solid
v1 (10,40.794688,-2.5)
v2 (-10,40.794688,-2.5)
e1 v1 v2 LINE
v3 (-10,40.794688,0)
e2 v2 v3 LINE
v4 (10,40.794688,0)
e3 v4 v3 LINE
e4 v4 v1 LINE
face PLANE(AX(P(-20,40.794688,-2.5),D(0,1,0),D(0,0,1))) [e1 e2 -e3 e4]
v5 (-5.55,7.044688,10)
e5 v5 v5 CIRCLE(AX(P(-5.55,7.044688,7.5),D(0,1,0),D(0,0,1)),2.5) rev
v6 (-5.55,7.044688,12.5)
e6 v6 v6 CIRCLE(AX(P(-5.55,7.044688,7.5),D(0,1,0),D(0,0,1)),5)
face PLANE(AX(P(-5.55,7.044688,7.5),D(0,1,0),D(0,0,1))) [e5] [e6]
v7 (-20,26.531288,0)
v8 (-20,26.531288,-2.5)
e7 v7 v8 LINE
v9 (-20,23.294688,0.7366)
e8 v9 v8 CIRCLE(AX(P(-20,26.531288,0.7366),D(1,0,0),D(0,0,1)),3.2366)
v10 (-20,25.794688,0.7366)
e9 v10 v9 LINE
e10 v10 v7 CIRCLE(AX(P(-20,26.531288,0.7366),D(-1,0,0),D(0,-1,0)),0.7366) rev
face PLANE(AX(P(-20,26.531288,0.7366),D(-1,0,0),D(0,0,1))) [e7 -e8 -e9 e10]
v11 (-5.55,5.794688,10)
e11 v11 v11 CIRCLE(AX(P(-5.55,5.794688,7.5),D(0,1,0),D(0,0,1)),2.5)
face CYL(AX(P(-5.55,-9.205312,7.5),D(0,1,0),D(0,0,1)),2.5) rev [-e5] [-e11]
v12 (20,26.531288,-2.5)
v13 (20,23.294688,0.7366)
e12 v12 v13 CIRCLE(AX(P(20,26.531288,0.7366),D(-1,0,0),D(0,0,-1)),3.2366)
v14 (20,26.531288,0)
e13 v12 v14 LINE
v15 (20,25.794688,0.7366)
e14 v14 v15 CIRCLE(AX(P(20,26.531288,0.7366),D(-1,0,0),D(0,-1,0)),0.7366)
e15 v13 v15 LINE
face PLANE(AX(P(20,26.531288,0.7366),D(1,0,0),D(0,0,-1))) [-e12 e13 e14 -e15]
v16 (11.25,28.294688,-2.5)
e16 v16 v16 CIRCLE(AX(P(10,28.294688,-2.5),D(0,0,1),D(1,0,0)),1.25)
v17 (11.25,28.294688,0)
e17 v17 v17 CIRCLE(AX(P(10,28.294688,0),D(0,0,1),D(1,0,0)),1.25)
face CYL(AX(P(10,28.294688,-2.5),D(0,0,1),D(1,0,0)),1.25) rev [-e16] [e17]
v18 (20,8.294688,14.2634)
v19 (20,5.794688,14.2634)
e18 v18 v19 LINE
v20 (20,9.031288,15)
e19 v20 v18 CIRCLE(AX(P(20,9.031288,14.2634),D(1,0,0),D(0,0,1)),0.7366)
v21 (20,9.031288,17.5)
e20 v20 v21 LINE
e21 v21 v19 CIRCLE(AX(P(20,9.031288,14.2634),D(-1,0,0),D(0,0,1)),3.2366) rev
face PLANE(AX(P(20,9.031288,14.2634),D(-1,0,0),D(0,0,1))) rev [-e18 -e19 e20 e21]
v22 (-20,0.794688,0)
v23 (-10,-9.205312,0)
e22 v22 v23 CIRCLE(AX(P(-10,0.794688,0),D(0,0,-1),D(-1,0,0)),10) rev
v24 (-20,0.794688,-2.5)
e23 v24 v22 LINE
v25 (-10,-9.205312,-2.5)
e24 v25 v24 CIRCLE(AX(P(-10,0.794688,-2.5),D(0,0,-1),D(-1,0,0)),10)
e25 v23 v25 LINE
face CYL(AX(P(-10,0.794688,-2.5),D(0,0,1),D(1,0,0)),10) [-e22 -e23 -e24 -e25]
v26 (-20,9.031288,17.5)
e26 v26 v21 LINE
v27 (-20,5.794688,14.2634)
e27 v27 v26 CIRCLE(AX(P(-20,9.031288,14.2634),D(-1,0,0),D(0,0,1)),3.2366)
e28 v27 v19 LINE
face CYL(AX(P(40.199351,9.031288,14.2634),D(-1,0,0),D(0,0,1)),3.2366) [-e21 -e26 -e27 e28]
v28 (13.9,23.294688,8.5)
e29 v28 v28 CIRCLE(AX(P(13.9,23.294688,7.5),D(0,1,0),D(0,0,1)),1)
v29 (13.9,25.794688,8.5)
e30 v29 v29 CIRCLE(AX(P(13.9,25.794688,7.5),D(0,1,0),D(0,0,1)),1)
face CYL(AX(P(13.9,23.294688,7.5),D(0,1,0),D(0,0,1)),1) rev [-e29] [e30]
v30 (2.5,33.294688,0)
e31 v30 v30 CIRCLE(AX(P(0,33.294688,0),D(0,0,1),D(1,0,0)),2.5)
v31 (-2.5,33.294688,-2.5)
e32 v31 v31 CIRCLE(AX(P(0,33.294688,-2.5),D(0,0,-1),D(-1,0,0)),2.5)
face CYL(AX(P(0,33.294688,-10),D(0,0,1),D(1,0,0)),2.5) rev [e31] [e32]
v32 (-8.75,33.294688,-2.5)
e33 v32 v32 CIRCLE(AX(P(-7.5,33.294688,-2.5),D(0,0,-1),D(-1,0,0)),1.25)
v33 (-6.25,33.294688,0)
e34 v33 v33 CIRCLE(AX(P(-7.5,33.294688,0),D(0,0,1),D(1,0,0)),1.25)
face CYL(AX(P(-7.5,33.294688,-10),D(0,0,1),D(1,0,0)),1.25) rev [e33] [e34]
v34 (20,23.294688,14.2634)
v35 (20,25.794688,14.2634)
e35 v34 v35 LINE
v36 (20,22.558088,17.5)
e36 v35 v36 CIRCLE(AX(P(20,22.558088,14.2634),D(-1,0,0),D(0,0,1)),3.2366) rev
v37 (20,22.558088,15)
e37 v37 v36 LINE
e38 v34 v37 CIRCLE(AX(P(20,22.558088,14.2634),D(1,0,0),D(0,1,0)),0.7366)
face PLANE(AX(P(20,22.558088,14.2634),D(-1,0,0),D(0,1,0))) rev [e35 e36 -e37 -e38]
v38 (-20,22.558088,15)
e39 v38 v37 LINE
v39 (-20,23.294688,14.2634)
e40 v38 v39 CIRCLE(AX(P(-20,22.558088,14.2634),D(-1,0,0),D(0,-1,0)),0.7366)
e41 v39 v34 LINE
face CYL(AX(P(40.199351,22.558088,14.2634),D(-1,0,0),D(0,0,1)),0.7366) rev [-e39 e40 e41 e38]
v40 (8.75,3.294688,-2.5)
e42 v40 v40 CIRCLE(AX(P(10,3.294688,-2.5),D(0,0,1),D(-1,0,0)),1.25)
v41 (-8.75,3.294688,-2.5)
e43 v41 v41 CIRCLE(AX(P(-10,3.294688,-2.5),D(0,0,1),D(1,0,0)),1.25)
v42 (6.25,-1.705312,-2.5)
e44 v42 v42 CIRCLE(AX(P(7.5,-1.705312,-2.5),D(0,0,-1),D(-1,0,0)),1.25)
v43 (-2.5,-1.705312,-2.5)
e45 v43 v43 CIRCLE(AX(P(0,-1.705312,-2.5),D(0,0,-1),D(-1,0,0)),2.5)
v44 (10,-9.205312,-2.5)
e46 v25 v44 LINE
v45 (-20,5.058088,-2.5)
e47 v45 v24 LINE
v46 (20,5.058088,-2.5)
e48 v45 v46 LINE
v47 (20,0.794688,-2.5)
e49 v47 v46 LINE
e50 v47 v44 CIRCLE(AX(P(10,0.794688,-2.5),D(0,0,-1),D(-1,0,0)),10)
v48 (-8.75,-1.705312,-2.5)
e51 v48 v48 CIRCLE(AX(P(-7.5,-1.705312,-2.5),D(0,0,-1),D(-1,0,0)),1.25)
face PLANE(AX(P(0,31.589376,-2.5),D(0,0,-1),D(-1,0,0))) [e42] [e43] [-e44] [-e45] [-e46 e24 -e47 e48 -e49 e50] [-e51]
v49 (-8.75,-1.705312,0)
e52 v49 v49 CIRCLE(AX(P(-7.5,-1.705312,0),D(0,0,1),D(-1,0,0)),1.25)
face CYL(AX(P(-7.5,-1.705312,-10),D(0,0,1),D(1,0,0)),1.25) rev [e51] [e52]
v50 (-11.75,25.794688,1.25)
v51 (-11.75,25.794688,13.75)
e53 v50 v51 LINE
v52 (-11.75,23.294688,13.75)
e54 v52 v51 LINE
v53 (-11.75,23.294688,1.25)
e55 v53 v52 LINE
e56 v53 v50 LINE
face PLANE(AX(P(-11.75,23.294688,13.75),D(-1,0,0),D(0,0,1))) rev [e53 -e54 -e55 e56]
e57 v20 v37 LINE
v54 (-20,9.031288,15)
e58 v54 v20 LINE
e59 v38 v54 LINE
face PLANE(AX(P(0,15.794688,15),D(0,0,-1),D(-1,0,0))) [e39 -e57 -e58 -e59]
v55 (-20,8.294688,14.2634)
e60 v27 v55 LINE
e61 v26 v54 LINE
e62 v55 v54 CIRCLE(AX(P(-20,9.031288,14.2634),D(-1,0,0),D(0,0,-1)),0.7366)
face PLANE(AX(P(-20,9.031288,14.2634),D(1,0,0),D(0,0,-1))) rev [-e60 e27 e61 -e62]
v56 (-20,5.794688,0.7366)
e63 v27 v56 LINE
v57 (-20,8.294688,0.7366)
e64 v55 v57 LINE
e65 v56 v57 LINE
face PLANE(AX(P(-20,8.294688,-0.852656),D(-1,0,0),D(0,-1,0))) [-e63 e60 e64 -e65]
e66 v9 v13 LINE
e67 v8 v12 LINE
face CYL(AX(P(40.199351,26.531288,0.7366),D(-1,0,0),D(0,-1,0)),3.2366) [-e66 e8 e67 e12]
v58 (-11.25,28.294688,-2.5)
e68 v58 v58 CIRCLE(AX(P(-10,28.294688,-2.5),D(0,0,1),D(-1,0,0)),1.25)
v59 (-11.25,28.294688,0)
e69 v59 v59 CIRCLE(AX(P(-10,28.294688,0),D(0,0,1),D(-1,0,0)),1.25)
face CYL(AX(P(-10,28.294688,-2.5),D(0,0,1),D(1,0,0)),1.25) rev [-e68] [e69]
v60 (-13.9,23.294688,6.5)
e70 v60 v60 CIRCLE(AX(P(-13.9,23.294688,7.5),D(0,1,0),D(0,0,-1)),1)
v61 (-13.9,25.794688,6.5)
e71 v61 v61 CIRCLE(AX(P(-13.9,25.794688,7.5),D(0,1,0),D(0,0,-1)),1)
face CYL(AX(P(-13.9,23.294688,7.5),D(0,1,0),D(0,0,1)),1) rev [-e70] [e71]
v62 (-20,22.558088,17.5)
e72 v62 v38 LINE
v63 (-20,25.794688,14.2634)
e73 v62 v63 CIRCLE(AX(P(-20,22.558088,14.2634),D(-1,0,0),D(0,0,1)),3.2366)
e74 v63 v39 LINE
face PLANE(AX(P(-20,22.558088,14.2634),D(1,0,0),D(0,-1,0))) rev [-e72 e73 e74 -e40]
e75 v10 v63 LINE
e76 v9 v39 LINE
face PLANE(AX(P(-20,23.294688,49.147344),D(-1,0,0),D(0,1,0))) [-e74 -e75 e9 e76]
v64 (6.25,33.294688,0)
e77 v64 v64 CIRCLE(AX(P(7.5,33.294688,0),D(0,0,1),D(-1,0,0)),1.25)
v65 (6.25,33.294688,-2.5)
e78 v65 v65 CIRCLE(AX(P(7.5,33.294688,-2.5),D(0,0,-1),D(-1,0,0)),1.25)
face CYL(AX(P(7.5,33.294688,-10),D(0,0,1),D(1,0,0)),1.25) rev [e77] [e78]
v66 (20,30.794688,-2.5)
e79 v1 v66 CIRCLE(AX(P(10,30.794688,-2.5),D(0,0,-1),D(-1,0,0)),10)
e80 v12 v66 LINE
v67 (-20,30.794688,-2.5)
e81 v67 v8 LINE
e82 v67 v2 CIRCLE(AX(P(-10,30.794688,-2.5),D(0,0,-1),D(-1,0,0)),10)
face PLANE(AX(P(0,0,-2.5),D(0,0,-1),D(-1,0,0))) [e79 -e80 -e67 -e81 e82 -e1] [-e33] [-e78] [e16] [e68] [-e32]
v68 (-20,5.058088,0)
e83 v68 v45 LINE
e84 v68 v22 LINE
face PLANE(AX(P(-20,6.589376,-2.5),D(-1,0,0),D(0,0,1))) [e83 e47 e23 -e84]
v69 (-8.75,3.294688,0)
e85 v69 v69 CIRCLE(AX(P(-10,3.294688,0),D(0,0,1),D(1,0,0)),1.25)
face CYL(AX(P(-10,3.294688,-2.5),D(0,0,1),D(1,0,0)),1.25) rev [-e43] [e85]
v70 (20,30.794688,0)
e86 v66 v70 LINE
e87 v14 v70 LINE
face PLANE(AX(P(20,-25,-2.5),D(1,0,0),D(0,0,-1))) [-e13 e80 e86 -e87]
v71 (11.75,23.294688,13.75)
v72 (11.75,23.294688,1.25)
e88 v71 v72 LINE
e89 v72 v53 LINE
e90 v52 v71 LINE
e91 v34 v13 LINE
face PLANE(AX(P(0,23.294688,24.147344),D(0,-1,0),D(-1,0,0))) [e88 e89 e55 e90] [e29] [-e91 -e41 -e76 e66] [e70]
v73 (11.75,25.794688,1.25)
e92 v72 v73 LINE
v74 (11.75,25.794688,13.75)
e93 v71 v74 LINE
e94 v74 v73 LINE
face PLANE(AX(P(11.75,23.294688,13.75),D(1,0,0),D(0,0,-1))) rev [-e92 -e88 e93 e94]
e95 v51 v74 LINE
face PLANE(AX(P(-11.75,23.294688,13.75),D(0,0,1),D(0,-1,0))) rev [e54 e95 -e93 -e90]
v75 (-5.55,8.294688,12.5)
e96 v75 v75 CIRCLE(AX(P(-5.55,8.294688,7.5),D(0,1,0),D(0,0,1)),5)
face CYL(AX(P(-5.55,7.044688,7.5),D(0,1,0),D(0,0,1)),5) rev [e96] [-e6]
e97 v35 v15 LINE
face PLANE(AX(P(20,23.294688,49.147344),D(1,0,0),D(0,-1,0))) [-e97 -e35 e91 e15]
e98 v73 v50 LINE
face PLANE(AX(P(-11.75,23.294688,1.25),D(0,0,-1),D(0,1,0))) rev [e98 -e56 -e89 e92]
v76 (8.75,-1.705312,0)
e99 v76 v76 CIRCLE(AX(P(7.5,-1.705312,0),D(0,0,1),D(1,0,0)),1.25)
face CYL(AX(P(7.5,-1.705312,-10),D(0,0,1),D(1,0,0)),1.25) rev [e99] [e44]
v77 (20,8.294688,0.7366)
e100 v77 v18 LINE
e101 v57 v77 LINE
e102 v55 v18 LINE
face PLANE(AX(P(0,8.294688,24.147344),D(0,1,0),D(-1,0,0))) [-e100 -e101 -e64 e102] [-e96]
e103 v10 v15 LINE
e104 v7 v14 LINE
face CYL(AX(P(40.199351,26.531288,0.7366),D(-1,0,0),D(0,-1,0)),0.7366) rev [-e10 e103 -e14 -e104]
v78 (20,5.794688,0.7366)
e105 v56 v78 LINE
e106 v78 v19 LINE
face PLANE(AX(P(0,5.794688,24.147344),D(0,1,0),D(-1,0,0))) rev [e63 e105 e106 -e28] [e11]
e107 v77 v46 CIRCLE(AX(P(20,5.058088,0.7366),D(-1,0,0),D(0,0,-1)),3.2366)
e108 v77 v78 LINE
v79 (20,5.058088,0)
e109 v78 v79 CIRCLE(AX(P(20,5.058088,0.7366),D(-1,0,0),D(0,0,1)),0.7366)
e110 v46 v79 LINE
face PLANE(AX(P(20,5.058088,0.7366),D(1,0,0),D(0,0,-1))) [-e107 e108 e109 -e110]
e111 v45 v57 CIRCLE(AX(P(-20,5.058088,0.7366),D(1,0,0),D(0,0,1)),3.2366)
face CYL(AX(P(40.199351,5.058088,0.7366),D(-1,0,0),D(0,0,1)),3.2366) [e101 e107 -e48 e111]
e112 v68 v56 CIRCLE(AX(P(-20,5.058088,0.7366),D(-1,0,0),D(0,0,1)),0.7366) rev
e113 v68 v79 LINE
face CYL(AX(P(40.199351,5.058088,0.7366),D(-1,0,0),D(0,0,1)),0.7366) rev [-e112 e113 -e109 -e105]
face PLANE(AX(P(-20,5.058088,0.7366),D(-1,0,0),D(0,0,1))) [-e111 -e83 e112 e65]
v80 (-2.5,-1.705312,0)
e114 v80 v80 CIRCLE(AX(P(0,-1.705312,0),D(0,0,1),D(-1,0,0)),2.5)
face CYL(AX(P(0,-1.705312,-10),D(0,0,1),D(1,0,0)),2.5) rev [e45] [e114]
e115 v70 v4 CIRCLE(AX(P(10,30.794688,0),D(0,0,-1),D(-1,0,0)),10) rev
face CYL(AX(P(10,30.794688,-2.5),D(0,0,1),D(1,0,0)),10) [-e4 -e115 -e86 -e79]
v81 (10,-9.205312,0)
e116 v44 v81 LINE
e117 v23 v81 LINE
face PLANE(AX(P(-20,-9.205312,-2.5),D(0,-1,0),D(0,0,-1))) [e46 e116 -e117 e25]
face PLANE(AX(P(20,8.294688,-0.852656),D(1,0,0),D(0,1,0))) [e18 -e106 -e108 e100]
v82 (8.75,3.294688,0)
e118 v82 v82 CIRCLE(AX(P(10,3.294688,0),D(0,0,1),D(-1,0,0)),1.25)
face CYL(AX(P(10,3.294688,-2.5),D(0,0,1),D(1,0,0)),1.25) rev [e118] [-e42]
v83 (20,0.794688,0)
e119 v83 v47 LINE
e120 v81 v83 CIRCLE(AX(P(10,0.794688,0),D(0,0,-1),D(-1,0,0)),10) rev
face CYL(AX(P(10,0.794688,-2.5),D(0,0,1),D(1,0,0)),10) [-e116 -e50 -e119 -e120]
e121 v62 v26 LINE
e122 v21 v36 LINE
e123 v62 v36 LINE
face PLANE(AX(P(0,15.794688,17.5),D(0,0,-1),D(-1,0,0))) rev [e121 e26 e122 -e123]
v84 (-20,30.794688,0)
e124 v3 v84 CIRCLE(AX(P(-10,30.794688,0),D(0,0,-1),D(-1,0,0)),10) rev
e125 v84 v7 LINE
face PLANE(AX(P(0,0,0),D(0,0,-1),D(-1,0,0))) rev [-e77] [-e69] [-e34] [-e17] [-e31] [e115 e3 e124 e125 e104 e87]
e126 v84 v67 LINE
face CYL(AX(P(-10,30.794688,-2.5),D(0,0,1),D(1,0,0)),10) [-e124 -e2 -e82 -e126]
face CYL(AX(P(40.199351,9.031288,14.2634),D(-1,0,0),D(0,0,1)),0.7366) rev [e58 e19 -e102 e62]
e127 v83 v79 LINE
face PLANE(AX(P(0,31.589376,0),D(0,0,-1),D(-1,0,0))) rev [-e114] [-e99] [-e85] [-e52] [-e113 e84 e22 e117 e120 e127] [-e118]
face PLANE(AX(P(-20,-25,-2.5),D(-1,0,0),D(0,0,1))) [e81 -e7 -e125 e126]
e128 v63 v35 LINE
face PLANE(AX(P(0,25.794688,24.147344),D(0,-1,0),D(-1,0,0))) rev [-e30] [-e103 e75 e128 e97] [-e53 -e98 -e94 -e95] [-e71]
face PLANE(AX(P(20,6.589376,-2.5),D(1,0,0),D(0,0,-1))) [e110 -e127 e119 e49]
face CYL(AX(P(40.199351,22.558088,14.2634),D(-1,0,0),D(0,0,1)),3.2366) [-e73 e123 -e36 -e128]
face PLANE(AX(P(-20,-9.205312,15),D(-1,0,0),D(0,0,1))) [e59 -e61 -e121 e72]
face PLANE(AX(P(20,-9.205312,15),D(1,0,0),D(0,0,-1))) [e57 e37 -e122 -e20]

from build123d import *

# Parameters (mm, degrees)
SKETCH1_W           = 40
SKETCH1_H           = 50
SKETCH1_R           = 1.25
BASE_FLANGE1_DEPTH  = 2.5
SKETCH15_R          = 1
CUT_EXTRUDE3_DEPTH  = 10
JOG3_START          = -2.5
JOG3_OUTLINE_W      = 40
JOG3_OUTLINE_H      = 48.294687966
JOG3_OUTLINE_R      = 1
JOG3_OUTLINE_R_2    = 1.25
JOG3_DEPTH          = 2.5
JOG3_2_OUTLINE_W    = 40
JOG3_2_OUTLINE_H    = 1.705312034
JOG3_2_DEPTH        = 0.332528284
JOG3_START_2        = 14.2634
JOG3_3_OUTLINE_W    = 40
JOG3_3_OUTLINE_H    = 35
JOG3_3_OUTLINE_R    = 1
JOG3_3_OUTLINE_R_2  = 1.25
JOG3_3_DEPTH        = 3.2366
JOG3_4_OUTLINE_W    = 40
JOG3_4_OUTLINE_H    = 15.794687966
JOG3_4_OUTLINE_R    = 1.25
JOG3_4_DEPTH        = 3.2366
JOG3_5_OUTLINE_W    = 40
JOG3_5_OUTLINE_H    = 2.5
JOG3_5_DEPTH        = 15
JOG3_START_3        = 15
JOG3_6_OUTLINE_R    = 1.25
JOG3_6_OUTLINE_R_2  = 1
JOG3_6_DEPTH        = 2.5
JOG3_START_4        = -20
JOG3_7_DEPTH        = 40
JOG4_START          = -20
JOG4_DEPTH          = 40
JOG4_2_DEPTH        = 40
JOG4_START_2        = -3
JOG4_3_OUTLINE_R    = 1.25
JOG4_3_DEPTH        = 4
FILLET1_R           = 10
SKETCH18_R          = 2.5
BOSS_EXTRUDE1_DEPTH = 2.5
SKETCH19_R          = 1
SKETCH19_W          = 23.5
SKETCH19_H          = 12.5
CUT_EXTRUDE4_DEPTH  = 2.5
SKETCH20_R          = 2.5
SKETCH20_R_2        = 1.25
CUT_EXTRUDE6_DEPTH  = 10
SKETCH23_R          = 2.5
CUT_EXTRUDE7_DEPTH  = 44.945989578
SKETCH24_R          = 5
CUT_EXTRUDE8_DEPTH  = 1.25


with BuildPart() as part:
    # Base-Flange1: sheet metal written as solids
    # Sketch1 → Base-Flange1 (new body)
    with BuildSketch(Plane.XY):
        Rectangle(SKETCH1_W, SKETCH1_H)
        with Locations((10, 12.5)):
            Circle(SKETCH1_R, mode=Mode.SUBTRACT)
        with Locations(Location((10, -12.5, 0), (0, 0, 180))):
            Circle(SKETCH1_R, mode=Mode.SUBTRACT)
        with Locations((-10, -12.5)):
            Circle(SKETCH1_R, mode=Mode.SUBTRACT)
        with Locations(Location((-10, 12.5, 0), (0, 0, 180))):
            Circle(SKETCH1_R, mode=Mode.SUBTRACT)
    extrude(amount=-BASE_FLANGE1_DEPTH)

    # Sketch15 → Cut-Extrude3 (cut)
    with BuildSketch(Plane.XY):
        with Locations((12, 0)):
            Circle(SKETCH15_R)
        with Locations(Location((-17, 0, 0), (0, 0, 180))):
            Circle(SKETCH15_R)
    extrude(amount=-CUT_EXTRUDE3_DEPTH, mode=Mode.SUBTRACT)

    # Jog3: read off the stored shape, not the designer's step
    # Jog3 outline → Jog3 (cut)
    with BuildSketch(Plane.XY.offset(JOG3_START)):
        with Locations((0, -0.852656017)):
            Rectangle(JOG3_OUTLINE_W, JOG3_OUTLINE_H)
        with Locations((-17, 0)):
            Circle(JOG3_OUTLINE_R, mode=Mode.SUBTRACT)
        with Locations((12, 0)):
            Circle(JOG3_OUTLINE_R, mode=Mode.SUBTRACT)
        with Locations((-10, 12.5)):
            Circle(JOG3_OUTLINE_R_2, mode=Mode.SUBTRACT)
        with Locations((10, 12.5)):
            Circle(JOG3_OUTLINE_R_2, mode=Mode.SUBTRACT)
        with Locations((10, -12.5)):
            Circle(JOG3_OUTLINE_R_2, mode=Mode.SUBTRACT)
        with Locations((-10, -12.5)):
            Circle(JOG3_OUTLINE_R_2, mode=Mode.SUBTRACT)
    extrude(amount=JOG3_DEPTH, mode=Mode.SUBTRACT)

    # Jog3 2 outline → Jog3 2 (cut)
    with BuildSketch(Plane.XY.offset(JOG3_START)):
        with Locations((0, 24.147343983)):
            Rectangle(JOG3_2_OUTLINE_W, JOG3_2_OUTLINE_H)
    extrude(amount=JOG3_2_DEPTH, mode=Mode.SUBTRACT)

    # Jog3 4 outline → Jog3 4 (add)
    with BuildSketch(Plane.XY.offset(JOG3_START)):
        with Locations((0, 32.897343983)):
            Rectangle(JOG3_4_OUTLINE_W, JOG3_4_OUTLINE_H)
        with Locations((10, 28.294687966)):
            Circle(JOG3_4_OUTLINE_R, mode=Mode.SUBTRACT)
        with Locations((-10, 28.294687966)):
            Circle(JOG3_4_OUTLINE_R, mode=Mode.SUBTRACT)
    extrude(amount=JOG3_4_DEPTH)



with BuildPart() as body_2:
    # Jog3 3 outline → Jog3 3 (new body)
    with BuildSketch(Plane.XY.offset(JOG3_START_2)):
        with Locations((0, 8.294687966)):
            Rectangle(JOG3_3_OUTLINE_W, JOG3_3_OUTLINE_H)
        with Locations((12, 15.794687966)):
            Circle(JOG3_3_OUTLINE_R, mode=Mode.SUBTRACT)
        with Locations((-17, 0)):
            Circle(JOG3_3_OUTLINE_R, mode=Mode.SUBTRACT)
        with Locations((-10, 3.294687966)):
            Circle(JOG3_3_OUTLINE_R_2, mode=Mode.SUBTRACT)
        with Locations((12, 0)):
            Circle(JOG3_3_OUTLINE_R, mode=Mode.SUBTRACT)
        with Locations((10, 3.294687966)):
            Circle(JOG3_3_OUTLINE_R_2, mode=Mode.SUBTRACT)
        with Locations((-17, 15.794687966)):
            Circle(JOG3_3_OUTLINE_R, mode=Mode.SUBTRACT)
        with Locations((-10, 12.5)):
            Circle(JOG3_3_OUTLINE_R_2, mode=Mode.SUBTRACT)
        with Locations((10, 12.5)):
            Circle(JOG3_3_OUTLINE_R_2, mode=Mode.SUBTRACT)
    extrude(amount=JOG3_3_DEPTH)


with BuildPart() as part_1:
    add(part.part)

    add(body_2.part)  # Jog3 5 merges body 2
    # Jog3 5 outline → Jog3 5 (add)
    with BuildSketch(Plane.XY):
        with Locations((0, 24.544687966)):
            Rectangle(JOG3_5_OUTLINE_W, JOG3_5_OUTLINE_H)
    extrude(amount=JOG3_5_DEPTH)

    # Jog3 6 outline → Jog3 6 (add)
    with BuildSketch(Plane.XY.offset(JOG3_START_3)):
        with Locations((10, 12.5)):
            Circle(JOG3_6_OUTLINE_R)
        with Locations((-10, 12.5)):
            Circle(JOG3_6_OUTLINE_R)
        with Locations((12, 0)):
            Circle(JOG3_6_OUTLINE_R_2)
        with Locations((-17, 0)):
            Circle(JOG3_6_OUTLINE_R_2)
    extrude(amount=JOG3_6_DEPTH)

    # Jog3 7 outline → Jog3 7 (cut)
    with BuildSketch(Plane.YZ.offset(JOG3_START_4)):
        with BuildLine():
            ThreePointArc((23.294687966, 14.2634), (23.078942821, 14.784254855), (22.558087966, 15))
            Line((22.558087966, 15), (-9.205312034, 15))
            Line((-9.205312034, 15), (-9.205312034, 14.2634))
            Line((-9.205312034, 14.2634), (23.294687966, 14.2634))
        make_face()
        with BuildLine():
            ThreePointArc((26.531287966, -2.5), (24.242666158, -1.552021808), (23.294687966, 0.7366))
            Line((23.294687966, 0.7366), (23.294687966, -2.167471716))
            Line((23.294687966, -2.167471716), (25, -2.167471716))
            Line((25, -2.167471716), (25, -2.5))
            Line((25, -2.5), (26.531287966, -2.5))
        make_face()
        with BuildLine():
            Line((26.531287966, 0), (40.794687966, 0))
            Line((40.794687966, 0), (40.794687966, 0.7366))
            Line((40.794687966, 0.7366), (25.794687966, 0.7366))
            ThreePointArc((25.794687966, 0.7366), (26.010433111, 0.215745145), (26.531287966, 0))
        make_face()
        with BuildLine():
            Line((25.794687966, 17.5), (22.558087966, 17.5))
            ThreePointArc((22.558087966, 17.5), (24.846709774, 16.552021808), (25.794687966, 14.2634))
            Line((25.794687966, 14.2634), (25.794687966, 17.5))
        make_face()
    extrude(amount=JOG3_7_DEPTH, mode=Mode.SUBTRACT)

    # Jog4: read off the stored shape, not the designer's step
    # Jog4 outline → Jog4 (cut)
    with BuildSketch(Plane.YZ.offset(JOG4_START)):
        with BuildLine():
            Line((-9.205312034, 15), (5.87962174, 15))
            ThreePointArc((5.87962174, 15), (7.019882984, 16.799110859), (9.031287966, 17.5))
            Line((9.031287966, 17.5), (-9.205312034, 17.5))
            Line((-9.205312034, 17.5), (-9.205312034, 15))
        make_face()
    extrude(amount=JOG4_DEPTH, mode=Mode.SUBTRACT)

    # Jog4 2 outline → Jog4 2 (add)
    with BuildSketch(Plane.YZ.offset(JOG4_START)):
        with BuildLine():
            Line((-9.205312034, 0), (-9.205312034, -2.5))
            Line((-9.205312034, -2.5), (5.058087966, -2.5))
            ThreePointArc((5.058087966, -2.5), (7.346709774, -1.552021808), (8.294687966, 0.7366))
            Line((8.294687966, 0.7366), (8.294687966, 14.2634))
            ThreePointArc((8.294687966, 14.2634), (8.510433111, 14.784254855), (9.031287966, 15))
            Line((9.031287966, 15), (5.87962174, 15))
            ThreePointArc((5.87962174, 15), (5.81599152, 14.634140241), (5.794687966, 14.2634))
            Line((5.794687966, 14.2634), (5.794687966, 0.7366))
            ThreePointArc((5.794687966, 0.7366), (5.578942821, 0.215745145), (5.058087966, 0))
            Line((5.058087966, 0), (-9.205312034, 0))
        make_face()
    extrude(amount=JOG4_2_DEPTH)

    # Jog4 3 outline → Jog4 3 (cut)
    with BuildSketch(Plane.XY.offset(JOG4_START_2)):
        with Locations((-10, 3.294687966)):
            Circle(JOG4_3_OUTLINE_R)
        with Locations((10, 3.294687966)):
            Circle(JOG4_3_OUTLINE_R)
    extrude(amount=JOG4_3_DEPTH, mode=Mode.SUBTRACT)

    # Fillet1
    fillet1_edges = [part_1.edges().sort_by_distance(p)[0] for p in [
        (20, -9.205312034, -1.25),
        (-20, -9.205312034, -1.25),
        (-20, 40.794687966, -1.25),
        (20, 40.794687966, -1.25),
    ]]
    fillet(fillet1_edges, radius=FILLET1_R)

    # Sketch18 → Boss-Extrude1 (add)
    with BuildSketch(Plane.XY.offset(17.5)):
        with Locations((12, 15.794687966)):
            Circle(SKETCH18_R)
        with Locations((-17, 15.794687966)):
            Circle(SKETCH18_R)
    extrude(amount=-BOSS_EXTRUDE1_DEPTH)

    # Sketch19 → Cut-Extrude4 (cut)
    with BuildSketch(Plane(origin=(0, 25.794687966, 0), x_dir=(1, 0, 0), z_dir=(0, 1, 0))):
        with Locations(Location((13.9, -7.5, 0), (0, 0, 270))):
            Circle(SKETCH19_R)
        with Locations(Location((-13.9, -7.5, 0), (0, 0, 90))):
            Circle(SKETCH19_R)
        with Locations((0, -7.5)):
            Rectangle(SKETCH19_W, SKETCH19_H)
    extrude(amount=-CUT_EXTRUDE4_DEPTH, mode=Mode.SUBTRACT)

    # Sketch20 → Cut-Extrude6 (cut)
    with BuildSketch(Plane.XY):
        with Locations((0, 33.294687966)):
            Circle(SKETCH20_R)
        with Locations(Location((0, -1.705312034, 0), (0, 0, 180))):
            Circle(SKETCH20_R)
        with Locations((7.5, -1.705312034)):
            Circle(SKETCH20_R_2)
        with Locations(Location((-7.5, -1.705312034, 0), (0, 0, 180))):
            Circle(SKETCH20_R_2)
        with Locations(Location((7.5, 33.294687966, 0), (0, 0, 180))):
            Circle(SKETCH20_R_2)
        with Locations((-7.5, 33.294687966)):
            Circle(SKETCH20_R_2)
    extrude(amount=-CUT_EXTRUDE6_DEPTH, mode=Mode.SUBTRACT)

    # Sketch23 → Cut-Extrude7 (cut, through all)
    with BuildSketch(Plane(origin=(0, 25.794687966, 0), x_dir=(1, 0, 0), z_dir=(0, 1, 0))):
        with Locations(Location((-5.55, -7.5, 0), (0, 0, 270))):
            Circle(SKETCH23_R)
    extrude(amount=-CUT_EXTRUDE7_DEPTH, mode=Mode.SUBTRACT)

    # Sketch24 → Cut-Extrude8 (cut)
    with BuildSketch(Plane(origin=(0, 8.294687966, 0), x_dir=(1, 0, 0), z_dir=(0, 1, 0))):
        with Locations(Location((-5.55, -7.5, 0), (0, 0, 270))):
            Circle(SKETCH24_R)
    extrude(amount=-CUT_EXTRUDE8_DEPTH, mode=Mode.SUBTRACT)


solid = part_1.part
